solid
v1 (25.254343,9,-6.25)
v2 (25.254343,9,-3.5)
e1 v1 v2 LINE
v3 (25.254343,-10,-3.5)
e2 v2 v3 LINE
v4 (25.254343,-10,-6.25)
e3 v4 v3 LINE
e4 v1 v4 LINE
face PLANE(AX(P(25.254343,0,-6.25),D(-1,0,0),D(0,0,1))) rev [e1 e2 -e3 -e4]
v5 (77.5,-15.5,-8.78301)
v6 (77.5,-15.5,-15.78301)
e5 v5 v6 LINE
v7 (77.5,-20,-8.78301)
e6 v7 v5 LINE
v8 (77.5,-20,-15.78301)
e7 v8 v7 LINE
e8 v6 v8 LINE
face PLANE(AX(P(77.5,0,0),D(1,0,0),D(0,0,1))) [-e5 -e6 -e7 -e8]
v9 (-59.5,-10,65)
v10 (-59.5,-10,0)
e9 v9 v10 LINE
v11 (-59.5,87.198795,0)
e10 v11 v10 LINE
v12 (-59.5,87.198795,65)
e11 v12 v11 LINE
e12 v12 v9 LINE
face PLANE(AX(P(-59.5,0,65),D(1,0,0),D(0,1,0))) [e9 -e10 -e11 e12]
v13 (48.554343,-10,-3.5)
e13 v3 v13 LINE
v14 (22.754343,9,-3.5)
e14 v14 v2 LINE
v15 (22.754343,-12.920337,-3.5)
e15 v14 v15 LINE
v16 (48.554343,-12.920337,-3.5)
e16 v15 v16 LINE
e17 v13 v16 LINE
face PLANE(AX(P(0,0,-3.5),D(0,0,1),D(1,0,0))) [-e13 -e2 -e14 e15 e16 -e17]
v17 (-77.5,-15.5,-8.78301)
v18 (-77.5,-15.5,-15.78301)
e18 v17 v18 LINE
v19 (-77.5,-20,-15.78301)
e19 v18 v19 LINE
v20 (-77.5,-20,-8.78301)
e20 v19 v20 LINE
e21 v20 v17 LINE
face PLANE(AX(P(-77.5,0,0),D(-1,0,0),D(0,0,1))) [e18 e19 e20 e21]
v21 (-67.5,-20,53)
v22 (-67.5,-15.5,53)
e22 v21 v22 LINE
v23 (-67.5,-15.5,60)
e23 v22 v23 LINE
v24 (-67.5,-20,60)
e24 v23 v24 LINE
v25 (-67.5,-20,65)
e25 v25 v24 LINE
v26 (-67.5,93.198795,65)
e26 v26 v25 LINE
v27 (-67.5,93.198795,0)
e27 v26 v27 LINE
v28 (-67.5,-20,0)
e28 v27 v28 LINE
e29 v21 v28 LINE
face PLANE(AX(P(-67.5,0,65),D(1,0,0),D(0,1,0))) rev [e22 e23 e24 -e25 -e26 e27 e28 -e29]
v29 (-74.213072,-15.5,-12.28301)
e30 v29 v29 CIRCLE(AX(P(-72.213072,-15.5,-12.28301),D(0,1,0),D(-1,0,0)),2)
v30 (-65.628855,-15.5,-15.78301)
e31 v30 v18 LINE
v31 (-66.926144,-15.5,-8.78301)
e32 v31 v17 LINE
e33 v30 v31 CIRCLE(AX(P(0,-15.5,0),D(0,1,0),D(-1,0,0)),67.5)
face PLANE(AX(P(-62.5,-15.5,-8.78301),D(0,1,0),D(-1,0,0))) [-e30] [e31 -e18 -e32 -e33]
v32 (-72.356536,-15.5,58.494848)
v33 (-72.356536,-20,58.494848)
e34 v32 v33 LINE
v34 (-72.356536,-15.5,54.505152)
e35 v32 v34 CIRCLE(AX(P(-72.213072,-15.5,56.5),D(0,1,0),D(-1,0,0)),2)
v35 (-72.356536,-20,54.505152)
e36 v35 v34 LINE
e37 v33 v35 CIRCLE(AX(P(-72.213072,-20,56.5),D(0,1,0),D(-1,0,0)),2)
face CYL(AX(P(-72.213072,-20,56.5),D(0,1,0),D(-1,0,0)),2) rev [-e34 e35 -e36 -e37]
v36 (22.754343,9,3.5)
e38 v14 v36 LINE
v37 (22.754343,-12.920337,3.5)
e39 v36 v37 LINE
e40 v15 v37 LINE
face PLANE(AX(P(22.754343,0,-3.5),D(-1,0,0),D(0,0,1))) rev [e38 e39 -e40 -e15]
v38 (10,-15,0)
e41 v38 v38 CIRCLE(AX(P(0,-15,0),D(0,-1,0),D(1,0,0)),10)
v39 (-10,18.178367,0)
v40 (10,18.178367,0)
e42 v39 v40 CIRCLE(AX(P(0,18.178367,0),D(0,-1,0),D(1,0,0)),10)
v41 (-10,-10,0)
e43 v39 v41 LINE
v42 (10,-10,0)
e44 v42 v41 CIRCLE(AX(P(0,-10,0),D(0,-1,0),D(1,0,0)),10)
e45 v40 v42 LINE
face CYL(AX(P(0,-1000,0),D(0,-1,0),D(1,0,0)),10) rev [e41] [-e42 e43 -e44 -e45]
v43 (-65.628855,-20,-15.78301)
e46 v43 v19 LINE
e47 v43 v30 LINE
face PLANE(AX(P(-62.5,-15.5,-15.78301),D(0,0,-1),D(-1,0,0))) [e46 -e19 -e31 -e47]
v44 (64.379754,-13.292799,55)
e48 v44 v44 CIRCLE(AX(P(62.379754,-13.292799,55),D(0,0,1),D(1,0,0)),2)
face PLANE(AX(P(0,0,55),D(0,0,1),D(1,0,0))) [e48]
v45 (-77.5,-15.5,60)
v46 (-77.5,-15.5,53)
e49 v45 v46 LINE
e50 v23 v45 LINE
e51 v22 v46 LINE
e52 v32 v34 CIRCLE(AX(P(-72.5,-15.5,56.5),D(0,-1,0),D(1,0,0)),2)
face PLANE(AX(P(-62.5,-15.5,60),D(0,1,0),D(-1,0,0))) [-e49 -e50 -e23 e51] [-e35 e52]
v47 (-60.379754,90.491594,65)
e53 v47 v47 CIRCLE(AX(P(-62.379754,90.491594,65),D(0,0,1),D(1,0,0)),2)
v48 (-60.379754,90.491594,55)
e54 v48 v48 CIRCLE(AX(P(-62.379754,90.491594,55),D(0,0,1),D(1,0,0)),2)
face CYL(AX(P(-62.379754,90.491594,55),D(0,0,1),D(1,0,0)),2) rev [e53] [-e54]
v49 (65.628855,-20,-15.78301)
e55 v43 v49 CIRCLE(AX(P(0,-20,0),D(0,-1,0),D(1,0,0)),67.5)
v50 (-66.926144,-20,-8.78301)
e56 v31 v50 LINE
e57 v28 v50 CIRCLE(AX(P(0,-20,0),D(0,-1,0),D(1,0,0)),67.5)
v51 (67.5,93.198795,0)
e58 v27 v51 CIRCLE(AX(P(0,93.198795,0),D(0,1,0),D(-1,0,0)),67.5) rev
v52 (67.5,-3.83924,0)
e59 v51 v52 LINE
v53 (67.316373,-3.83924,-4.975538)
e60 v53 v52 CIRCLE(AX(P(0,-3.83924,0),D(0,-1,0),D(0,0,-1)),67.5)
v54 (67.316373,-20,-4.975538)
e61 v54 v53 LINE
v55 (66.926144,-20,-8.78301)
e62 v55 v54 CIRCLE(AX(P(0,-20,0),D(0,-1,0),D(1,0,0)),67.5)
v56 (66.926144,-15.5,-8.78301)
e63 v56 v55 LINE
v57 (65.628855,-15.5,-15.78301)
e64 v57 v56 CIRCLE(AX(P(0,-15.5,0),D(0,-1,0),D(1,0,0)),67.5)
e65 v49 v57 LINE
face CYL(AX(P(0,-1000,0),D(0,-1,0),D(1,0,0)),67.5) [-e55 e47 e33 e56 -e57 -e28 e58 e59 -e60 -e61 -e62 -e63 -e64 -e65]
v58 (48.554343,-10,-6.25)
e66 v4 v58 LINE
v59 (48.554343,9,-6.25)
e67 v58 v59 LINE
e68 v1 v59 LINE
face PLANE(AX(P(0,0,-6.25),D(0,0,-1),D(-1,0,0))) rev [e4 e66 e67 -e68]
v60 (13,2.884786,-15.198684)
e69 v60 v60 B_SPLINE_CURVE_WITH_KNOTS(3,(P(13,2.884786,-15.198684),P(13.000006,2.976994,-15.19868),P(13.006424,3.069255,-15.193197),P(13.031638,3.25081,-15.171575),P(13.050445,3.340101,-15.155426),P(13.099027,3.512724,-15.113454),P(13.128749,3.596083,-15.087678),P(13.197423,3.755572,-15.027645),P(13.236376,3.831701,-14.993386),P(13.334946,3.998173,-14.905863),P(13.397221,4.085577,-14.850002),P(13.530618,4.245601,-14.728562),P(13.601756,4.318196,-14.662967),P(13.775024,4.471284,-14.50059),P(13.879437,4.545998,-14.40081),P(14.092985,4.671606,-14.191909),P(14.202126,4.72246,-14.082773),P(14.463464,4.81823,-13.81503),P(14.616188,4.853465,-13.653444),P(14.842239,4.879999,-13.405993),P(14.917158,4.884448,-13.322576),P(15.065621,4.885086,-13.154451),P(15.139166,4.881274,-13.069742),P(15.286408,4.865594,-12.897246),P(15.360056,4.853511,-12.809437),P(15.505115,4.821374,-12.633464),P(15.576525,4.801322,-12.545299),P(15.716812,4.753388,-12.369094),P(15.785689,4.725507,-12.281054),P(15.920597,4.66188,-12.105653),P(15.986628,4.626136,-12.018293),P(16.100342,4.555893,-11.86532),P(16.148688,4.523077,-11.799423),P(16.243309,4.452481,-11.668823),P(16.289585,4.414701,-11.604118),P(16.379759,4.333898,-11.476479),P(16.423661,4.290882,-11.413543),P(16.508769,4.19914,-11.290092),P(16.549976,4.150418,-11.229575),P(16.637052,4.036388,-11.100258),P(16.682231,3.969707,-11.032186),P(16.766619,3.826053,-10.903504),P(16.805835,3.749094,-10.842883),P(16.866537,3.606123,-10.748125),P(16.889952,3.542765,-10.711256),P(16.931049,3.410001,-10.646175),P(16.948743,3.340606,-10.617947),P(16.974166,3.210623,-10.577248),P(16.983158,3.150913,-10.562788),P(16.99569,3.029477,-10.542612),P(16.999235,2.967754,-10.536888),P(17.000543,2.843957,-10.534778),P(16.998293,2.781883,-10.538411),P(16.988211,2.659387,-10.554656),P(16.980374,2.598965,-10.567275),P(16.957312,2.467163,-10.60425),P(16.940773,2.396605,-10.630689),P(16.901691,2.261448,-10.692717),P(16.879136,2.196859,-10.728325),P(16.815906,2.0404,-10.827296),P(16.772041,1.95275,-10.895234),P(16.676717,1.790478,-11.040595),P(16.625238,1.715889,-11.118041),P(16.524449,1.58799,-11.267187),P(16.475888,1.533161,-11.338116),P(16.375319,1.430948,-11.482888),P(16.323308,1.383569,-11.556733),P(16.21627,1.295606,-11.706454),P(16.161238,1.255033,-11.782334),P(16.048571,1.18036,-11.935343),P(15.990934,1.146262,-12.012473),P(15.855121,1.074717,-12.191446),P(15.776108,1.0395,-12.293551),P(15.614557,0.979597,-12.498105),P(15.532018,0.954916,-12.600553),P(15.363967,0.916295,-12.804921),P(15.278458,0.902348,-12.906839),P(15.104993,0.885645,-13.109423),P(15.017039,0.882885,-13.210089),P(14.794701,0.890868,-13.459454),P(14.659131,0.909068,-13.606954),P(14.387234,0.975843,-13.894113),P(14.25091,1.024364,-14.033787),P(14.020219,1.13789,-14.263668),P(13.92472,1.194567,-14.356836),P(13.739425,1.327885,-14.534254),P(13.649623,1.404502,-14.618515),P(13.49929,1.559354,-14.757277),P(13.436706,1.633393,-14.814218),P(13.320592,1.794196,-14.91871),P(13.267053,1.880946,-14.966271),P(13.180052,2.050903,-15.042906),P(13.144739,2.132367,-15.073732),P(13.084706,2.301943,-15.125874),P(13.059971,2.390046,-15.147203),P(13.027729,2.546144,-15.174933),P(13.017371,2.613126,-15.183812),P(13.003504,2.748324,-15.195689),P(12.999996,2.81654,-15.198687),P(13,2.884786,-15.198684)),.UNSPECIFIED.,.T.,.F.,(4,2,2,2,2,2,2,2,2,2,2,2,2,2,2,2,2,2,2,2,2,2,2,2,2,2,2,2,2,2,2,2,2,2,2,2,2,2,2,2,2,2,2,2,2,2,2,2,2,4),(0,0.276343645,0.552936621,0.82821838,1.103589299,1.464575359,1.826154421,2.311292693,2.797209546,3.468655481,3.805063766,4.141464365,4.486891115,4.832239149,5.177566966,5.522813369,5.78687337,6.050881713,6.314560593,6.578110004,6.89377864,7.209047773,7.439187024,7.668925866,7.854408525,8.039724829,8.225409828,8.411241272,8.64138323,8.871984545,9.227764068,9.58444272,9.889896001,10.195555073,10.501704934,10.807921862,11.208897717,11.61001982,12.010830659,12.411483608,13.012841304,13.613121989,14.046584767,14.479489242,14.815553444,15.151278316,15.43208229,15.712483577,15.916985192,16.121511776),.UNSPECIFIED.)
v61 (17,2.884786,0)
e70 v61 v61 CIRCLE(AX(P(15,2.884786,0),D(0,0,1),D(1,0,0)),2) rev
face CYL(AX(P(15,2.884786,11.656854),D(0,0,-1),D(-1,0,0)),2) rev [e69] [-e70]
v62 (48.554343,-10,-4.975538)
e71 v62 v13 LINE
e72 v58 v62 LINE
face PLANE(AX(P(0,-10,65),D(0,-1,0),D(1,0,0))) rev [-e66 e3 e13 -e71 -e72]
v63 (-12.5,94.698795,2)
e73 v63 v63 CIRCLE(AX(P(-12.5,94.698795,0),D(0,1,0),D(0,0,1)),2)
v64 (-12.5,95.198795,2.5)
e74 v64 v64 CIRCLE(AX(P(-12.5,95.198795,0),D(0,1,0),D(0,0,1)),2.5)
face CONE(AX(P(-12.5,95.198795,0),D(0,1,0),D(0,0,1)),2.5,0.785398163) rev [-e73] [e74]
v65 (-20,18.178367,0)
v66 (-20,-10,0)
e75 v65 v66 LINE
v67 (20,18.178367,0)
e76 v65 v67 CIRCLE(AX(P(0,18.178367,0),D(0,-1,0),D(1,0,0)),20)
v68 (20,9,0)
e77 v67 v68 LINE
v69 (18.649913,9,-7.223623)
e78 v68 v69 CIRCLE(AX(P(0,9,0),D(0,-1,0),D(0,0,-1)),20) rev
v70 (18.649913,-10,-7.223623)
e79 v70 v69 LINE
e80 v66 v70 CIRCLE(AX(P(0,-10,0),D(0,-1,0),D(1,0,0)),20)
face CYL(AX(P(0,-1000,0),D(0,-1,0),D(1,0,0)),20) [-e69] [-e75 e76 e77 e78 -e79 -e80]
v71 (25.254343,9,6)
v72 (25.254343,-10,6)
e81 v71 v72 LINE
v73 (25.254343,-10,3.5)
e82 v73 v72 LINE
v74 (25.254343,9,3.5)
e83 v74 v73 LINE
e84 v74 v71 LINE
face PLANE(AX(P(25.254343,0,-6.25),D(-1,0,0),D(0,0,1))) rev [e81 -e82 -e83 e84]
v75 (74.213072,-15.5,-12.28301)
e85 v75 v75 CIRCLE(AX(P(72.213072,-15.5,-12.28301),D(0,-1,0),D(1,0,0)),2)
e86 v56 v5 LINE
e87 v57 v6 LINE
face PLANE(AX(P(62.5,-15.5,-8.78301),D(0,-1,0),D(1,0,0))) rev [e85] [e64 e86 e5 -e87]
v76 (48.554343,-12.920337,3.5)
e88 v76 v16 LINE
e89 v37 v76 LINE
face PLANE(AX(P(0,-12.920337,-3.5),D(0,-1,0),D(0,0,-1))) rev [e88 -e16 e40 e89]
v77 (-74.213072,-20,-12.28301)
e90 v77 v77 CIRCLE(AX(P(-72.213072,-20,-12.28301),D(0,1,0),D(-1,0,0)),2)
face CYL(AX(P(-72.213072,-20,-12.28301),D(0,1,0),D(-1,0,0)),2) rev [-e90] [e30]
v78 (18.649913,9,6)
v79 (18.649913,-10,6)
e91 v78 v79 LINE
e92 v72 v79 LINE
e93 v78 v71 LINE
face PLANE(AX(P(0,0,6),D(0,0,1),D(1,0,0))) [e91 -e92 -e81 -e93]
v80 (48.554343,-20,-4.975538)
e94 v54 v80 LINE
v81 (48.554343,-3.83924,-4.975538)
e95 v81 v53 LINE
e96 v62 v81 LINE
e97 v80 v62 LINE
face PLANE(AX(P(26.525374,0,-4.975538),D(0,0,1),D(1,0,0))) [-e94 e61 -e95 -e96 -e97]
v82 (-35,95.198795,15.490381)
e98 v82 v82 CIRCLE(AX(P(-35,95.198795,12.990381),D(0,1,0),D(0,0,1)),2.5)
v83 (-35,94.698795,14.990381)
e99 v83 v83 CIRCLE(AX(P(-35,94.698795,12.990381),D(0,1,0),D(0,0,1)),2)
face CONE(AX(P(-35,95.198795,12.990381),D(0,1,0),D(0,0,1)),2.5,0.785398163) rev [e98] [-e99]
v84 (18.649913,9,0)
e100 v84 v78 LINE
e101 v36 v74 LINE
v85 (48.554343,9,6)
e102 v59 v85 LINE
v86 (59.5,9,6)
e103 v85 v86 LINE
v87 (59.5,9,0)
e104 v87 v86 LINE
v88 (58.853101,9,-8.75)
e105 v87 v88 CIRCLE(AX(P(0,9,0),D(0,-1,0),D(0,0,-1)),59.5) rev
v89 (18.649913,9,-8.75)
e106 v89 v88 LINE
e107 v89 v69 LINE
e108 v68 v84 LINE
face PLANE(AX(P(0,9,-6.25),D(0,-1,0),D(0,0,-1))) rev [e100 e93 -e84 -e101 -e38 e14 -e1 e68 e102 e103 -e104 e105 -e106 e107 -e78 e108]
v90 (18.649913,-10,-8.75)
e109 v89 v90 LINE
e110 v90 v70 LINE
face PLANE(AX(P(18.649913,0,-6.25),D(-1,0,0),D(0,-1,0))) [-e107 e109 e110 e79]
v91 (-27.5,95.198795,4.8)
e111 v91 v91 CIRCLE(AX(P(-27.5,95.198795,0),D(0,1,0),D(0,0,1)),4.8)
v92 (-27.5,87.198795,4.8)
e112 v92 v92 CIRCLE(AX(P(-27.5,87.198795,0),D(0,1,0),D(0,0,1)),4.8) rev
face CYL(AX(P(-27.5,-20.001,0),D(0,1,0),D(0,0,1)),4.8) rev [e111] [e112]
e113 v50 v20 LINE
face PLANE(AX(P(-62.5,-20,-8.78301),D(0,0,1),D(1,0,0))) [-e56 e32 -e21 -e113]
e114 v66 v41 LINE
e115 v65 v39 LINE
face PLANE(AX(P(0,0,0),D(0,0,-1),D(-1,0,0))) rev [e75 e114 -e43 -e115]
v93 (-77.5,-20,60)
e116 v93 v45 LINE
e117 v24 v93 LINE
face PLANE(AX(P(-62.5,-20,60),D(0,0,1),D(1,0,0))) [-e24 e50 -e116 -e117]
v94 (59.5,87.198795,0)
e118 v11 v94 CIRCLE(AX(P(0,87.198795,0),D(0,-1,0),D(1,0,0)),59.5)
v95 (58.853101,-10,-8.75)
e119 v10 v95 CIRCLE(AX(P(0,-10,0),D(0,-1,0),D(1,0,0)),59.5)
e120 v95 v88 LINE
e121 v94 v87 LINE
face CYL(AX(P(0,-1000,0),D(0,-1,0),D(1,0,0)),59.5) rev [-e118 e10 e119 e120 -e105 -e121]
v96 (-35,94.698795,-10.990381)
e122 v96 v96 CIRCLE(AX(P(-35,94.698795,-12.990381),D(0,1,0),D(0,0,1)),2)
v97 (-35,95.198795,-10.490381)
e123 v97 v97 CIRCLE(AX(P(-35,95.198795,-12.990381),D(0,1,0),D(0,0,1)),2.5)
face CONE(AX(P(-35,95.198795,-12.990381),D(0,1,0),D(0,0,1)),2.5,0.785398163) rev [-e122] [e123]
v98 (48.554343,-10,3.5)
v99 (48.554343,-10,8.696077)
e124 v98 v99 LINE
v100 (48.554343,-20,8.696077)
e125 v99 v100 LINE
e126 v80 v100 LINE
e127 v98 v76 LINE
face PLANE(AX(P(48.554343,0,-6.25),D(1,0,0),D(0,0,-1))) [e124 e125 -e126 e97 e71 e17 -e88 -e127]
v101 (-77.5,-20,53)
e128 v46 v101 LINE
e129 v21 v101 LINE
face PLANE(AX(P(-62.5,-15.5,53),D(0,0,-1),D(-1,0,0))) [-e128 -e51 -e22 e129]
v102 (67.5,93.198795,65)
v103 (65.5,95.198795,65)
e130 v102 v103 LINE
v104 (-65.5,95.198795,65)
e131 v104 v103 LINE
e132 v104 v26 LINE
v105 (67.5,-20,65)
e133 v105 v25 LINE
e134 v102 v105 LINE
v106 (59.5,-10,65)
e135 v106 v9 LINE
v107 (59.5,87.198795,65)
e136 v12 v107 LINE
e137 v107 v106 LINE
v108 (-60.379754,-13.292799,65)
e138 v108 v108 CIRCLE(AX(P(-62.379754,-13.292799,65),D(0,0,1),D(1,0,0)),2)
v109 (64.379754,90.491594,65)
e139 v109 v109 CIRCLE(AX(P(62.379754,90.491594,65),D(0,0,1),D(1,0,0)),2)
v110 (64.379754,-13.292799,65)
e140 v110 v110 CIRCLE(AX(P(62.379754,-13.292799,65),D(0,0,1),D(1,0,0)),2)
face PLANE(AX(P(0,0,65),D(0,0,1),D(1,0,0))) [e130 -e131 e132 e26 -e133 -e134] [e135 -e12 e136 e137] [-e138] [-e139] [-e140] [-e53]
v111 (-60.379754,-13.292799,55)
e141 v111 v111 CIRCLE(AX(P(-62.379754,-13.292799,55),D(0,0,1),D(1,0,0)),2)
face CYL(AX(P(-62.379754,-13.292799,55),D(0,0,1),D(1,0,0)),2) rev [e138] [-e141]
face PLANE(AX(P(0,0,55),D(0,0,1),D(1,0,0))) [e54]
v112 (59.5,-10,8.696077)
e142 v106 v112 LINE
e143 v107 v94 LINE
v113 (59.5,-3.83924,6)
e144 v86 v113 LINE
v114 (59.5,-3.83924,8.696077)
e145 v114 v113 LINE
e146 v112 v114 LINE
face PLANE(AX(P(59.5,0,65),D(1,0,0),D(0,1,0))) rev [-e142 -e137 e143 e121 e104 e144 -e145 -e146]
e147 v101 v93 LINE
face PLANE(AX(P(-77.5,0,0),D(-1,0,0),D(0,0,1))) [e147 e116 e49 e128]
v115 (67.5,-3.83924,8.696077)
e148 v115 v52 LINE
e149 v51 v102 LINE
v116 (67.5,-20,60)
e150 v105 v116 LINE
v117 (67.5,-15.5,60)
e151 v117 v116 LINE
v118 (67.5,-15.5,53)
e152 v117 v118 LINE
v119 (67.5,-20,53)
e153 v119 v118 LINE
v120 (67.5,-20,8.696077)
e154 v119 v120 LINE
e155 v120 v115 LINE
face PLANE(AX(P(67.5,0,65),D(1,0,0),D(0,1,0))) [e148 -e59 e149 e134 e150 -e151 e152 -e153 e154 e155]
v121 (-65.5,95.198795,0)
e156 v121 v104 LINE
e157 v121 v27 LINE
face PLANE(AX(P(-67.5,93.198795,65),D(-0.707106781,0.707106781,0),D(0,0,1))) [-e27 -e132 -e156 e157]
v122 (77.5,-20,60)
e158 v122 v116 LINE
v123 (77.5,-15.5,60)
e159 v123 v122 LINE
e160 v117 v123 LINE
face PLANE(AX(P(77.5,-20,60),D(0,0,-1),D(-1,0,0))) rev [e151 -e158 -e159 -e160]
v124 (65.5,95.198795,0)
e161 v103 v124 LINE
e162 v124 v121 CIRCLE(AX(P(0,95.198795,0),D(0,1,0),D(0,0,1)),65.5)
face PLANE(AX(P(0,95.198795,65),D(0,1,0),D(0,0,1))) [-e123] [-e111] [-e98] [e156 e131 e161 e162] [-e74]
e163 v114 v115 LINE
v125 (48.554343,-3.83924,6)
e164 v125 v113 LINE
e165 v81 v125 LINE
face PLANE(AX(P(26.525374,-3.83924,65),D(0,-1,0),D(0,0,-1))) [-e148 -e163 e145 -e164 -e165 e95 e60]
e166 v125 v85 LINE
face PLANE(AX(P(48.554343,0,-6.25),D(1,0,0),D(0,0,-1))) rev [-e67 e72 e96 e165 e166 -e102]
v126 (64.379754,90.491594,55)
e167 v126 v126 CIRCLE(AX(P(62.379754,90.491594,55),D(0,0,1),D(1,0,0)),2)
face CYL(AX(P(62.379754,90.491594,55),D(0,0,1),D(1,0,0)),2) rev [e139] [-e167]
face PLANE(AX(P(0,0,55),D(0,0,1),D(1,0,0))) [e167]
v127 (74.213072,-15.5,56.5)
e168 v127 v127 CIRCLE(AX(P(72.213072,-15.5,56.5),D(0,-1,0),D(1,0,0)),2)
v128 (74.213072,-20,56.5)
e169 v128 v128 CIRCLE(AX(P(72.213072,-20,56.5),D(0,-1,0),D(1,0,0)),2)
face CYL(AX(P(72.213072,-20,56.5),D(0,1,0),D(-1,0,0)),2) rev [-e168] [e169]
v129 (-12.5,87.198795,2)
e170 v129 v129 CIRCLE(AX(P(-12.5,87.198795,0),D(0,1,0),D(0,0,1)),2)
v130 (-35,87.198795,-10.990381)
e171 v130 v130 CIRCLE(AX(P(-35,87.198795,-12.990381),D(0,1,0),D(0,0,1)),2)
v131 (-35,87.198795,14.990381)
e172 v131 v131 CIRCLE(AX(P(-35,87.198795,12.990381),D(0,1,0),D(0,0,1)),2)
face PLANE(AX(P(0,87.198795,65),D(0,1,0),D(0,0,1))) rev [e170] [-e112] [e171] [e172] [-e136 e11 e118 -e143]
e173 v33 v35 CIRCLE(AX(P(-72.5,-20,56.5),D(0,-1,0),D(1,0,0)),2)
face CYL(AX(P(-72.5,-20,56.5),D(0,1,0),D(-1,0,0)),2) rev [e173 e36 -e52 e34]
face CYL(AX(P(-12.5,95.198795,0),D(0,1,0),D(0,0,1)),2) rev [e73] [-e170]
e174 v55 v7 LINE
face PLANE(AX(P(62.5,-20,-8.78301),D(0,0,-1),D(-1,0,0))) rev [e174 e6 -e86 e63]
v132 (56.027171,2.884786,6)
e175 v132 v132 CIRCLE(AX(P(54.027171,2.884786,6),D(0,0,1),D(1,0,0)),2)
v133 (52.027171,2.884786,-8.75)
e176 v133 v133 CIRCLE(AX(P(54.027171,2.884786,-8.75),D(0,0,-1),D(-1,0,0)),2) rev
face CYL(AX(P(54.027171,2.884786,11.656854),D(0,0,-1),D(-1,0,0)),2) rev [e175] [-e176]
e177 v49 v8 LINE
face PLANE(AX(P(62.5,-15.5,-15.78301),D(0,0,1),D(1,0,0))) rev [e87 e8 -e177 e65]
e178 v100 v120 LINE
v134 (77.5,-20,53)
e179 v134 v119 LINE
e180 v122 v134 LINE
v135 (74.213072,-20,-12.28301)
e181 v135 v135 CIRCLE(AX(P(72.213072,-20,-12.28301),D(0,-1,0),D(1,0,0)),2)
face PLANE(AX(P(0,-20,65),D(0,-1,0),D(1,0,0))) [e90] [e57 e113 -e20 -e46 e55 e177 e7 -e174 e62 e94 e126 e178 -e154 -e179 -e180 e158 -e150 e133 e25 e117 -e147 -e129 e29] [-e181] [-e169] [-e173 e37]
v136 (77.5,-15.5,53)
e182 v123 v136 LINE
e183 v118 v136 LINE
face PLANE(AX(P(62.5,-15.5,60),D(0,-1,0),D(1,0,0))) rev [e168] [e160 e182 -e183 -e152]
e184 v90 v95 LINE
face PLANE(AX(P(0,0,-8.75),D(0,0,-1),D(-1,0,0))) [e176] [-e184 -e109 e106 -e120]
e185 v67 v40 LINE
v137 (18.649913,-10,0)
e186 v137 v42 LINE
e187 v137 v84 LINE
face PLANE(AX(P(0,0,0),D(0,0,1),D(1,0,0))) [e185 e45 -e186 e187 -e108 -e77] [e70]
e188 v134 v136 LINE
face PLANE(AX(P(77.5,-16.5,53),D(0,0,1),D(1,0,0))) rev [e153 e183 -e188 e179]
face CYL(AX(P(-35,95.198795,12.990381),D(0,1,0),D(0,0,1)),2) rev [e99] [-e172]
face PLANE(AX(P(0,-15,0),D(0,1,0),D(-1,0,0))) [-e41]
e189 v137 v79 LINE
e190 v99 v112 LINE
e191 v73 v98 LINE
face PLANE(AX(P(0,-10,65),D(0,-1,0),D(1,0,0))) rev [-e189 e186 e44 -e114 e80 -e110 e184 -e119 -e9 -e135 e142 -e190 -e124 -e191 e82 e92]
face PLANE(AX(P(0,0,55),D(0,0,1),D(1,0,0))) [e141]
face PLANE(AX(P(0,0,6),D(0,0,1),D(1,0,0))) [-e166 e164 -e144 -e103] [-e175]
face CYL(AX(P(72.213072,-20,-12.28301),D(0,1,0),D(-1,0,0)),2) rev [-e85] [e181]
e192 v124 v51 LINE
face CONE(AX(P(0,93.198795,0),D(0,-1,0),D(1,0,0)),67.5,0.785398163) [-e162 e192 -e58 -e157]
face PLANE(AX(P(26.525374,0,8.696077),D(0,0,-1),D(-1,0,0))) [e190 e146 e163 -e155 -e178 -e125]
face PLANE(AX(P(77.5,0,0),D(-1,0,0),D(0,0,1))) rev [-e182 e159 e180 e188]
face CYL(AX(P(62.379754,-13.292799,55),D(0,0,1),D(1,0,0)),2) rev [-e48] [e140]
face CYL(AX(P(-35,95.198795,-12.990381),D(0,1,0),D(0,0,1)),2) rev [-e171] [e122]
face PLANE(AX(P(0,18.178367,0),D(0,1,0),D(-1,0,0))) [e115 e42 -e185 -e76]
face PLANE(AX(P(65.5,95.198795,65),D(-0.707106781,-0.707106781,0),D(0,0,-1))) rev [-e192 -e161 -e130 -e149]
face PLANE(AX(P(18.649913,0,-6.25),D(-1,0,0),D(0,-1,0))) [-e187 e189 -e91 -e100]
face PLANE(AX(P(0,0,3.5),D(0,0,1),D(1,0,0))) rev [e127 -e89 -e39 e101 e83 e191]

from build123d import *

# Parameters (mm, degrees)
BOSS_EXTRUDE3_DEPTH                   = 65
BOSS_EXTRUDE1_DEPTH                   = 6
BOSS_EXTRUDE1_DEPTH_BACK              = 6.25
SKETCH1_5_W                           = 6.6044296
SKETCH1_5_H                           = 19
SKETCH1_5_W_2                         = 10.945657065
BOSS_EXTRUDE2_START                   = -8.75
BOSS_EXTRUDE2_OUTLINE_W               = 40.850086665
BOSS_EXTRUDE2_OUTLINE_H               = 19
BOSS_EXTRUDE2_DEPTH                   = 2.5
REVOLVE2_ANGLE                        = 180
SKETCH1_12_W                          = 10
SKETCH1_12_H                          = 5
REVOLVE4_START                        = -10
REVOLVE4_DEPTH                        = 28.178366994
SERVO_START                           = 67.5
SKETCH9_W                             = 13.671614749
SKETCH9_H                             = 17.273170498
SERVO_WIRE_CUT_DEPTH                  = 18.945657065
CUT_EXTRUDE2_DEPTH                    = 3.5
F_4_0_4_DIAMETER_HOLE1_D              = 4
F_4_0_4_DIAMETER_HOLE1_DEPTH          = 8
F_4_0_4_DIAMETER_HOLE1_CSINK_D        = 5
F_4_0_4_DIAMETER_HOLE1_CSINK_ANGLE    = 90
CIRPATTERN1_COUNT                     = 3
CUT_EXTRUDE4_REACH                    = 151.61
SKETCH21_2_R                          = 4.8
SKETCH12_R                            = 2
HEAT_SET_INSERT_CUT_DEPTH             = 17
HEAT_SET_INSERT_CUT_DIRECTION_2_REACH = 136.816
SKETCH14_R                            = 2
PANEL_HEAT_SET_INSERT_CUT_DEPTH       = 10
BOSS_EXTRUDE10_START                  = -5
SKETCH16_W                            = 7
SKETCH16_H                            = 4.5
BOSS_EXTRUDE10_DEPTH                  = 15
SKETCH18_W                            = 7
SKETCH18_H                            = 3.5
BOSS_EXTRUDE11_DEPTH                  = 10
SKETCH19_R                            = 2
CUT_EXTRUDE1_DEPTH                    = 152.05205452
CHAMFER1_SIZE                         = 2


# Read off the part's stored shape, not the designer's step: Boss-Extrude2, Revolve4
with BuildPart() as part:
    # Sketch4 → Boss-Extrude3 (new body)
    with BuildSketch(Plane.XY):
        Polygon((59.5, -10), (0, -10), (0, -15), (0, -20), (67.5, -20), (67.5, 95.198794821), (0, 95.198794821), (0, 87.198794821), (59.5, 87.198794821), align=None)
    boss_extrude3 = extrude(amount=BOSS_EXTRUDE3_DEPTH)

    # Mirror1: Boss-Extrude3 across plane
    add(boss_extrude3.mirror(Plane(origin=(0, 0, 0), x_dir=(0, 0, 1), z_dir=(1, 0, 0))))

    # Sketch1<5> → Boss-Extrude1 (add, two sides: drawn at the far end of the back side and taken through both)
    with BuildSketch(Plane.XY.offset(-BOSS_EXTRUDE1_DEPTH_BACK)):
        with Locations((21.952128135, -0.5)):
            Rectangle(SKETCH1_5_W, SKETCH1_5_H)
        with Locations((54.027171468, -0.5)):
            Rectangle(SKETCH1_5_W_2, SKETCH1_5_H)
    extrude(amount=BOSS_EXTRUDE1_DEPTH + BOSS_EXTRUDE1_DEPTH_BACK)

    # Boss-Extrude2 outline → Boss-Extrude2 (add)
    with BuildSketch(Plane.XY.offset(BOSS_EXTRUDE2_START)):
        with Locations((39.074956668, -0.5)):
            Rectangle(BOSS_EXTRUDE2_OUTLINE_W, BOSS_EXTRUDE2_OUTLINE_H)
    extrude(amount=BOSS_EXTRUDE2_DEPTH)

    # Sketch1 → Revolve2 (revolve)
    with BuildSketch(Plane.XY):
        Polygon((0, -15), (0, -20), (67.5, -20), (67.5, 95.198794821), (0, 95.198794821), (0, 87.198794821), (59.5, 87.198794821), (59.5, -10), (0, -10), align=None)
    revolve(axis=Axis((0, -1000, 0), (0, 1, 0)), revolution_arc=REVOLVE2_ANGLE)

    # Sketch1<12> → Cut-Revolve4 (revolve, cut)
    with BuildSketch(Plane.XY):
        with Locations((5, -12.5)):
            Rectangle(SKETCH1_12_W, SKETCH1_12_H)
    revolve(axis=Axis((0, -1000, 0), (0, 1, 0)), mode=Mode.SUBTRACT)

    # Revolve4 outline → Revolve4 (add)
    with BuildSketch(Plane(origin=(0, 0, 0), x_dir=(1, 0, 0), z_dir=(0, 1, 0)).offset(REVOLVE4_START)):
        with BuildLine():
            ThreePointArc((-10, 0), (0, 10), (10, 0))
            Line((10, 0), (20, 0))
            ThreePointArc((20, 0), (0, 20), (-20, 0))
            Line((-20, 0), (-10, 0))
        make_face()
    extrude(amount=REVOLVE4_DEPTH)

    # Sketch9 → Servo Wire Cut (cut)
    with BuildSketch(Plane(origin=(0, 0, 0), x_dir=(0, 0, -1), z_dir=(1, 0, 0)).offset(SERVO_START)):
        with Locations((-1.860269854, -12.475825554)):
            Rectangle(SKETCH9_W, SKETCH9_H)
    extrude(amount=-SERVO_WIRE_CUT_DEPTH, mode=Mode.SUBTRACT)

    # Sketch1<13> → Cut-Extrude2 (cut, symmetric)
    with BuildSketch(Plane.XY):
        Polygon((22.754342935, -12.920336749), (59.5, -12.920336749), (59.5, -10), (25.254342935, -10), (25.254342935, 9), (22.754342935, 9), align=None)
    extrude(amount=CUT_EXTRUDE2_DEPTH, both=True, mode=Mode.SUBTRACT)

    # Ø4.0 (4) Diameter Hole1
    with Locations(Plane(origin=(0, 95.198794821, 0), x_dir=(1, 0, 0), z_dir=(0, 1, 0))):
        with Locations((-12.5, 0)):
            f_4_0_4_diameter_hole1 = CounterSinkHole(F_4_0_4_DIAMETER_HOLE1_D / 2, F_4_0_4_DIAMETER_HOLE1_CSINK_D / 2, depth=F_4_0_4_DIAMETER_HOLE1_DEPTH, counter_sink_angle=F_4_0_4_DIAMETER_HOLE1_CSINK_ANGLE)

    # CirPattern1: Ø4.0 (4) Diameter Hole1 ×3 about axis
    cirpattern1_axis = Axis((-27.5, 0, 0), (0, 1, 0))
    for i in range(1, CIRPATTERN1_COUNT):
        add(f_4_0_4_diameter_hole1.rotate(cirpattern1_axis, i * 360 / CIRPATTERN1_COUNT), mode=Mode.SUBTRACT)

    # Sketch21<2> → Cut-Extrude4 (cut, up to next)
    with BuildSketch(Plane(origin=(0, 95.198794821, 0), x_dir=(1, 0, 0), z_dir=(0, 1, 0)), mode=Mode.PRIVATE) as cut_extrude4_sk1:
        with Locations(Location((-27.5, 0, 0), (0, 0, 270))):
            Circle(SKETCH21_2_R)
    cut_extrude4_tool1 = extrude(cut_extrude4_sk1.sketch, amount=-CUT_EXTRUDE4_REACH, mode=Mode.PRIVATE) & part.part
    add(cut_extrude4_tool1.solids().sort_by_distance((-27.5, 95.198795, 0))[0], mode=Mode.SUBTRACT)

    # Sketch12 → Heat Set Insert Cut (cut)
    with BuildSketch(Plane.XY):
        with Locations(Location((54.027171468, 2.884785525, 0), (0, 0, 180))):
            Circle(SKETCH12_R)
        with Locations(Location((15, 2.884785525, 0), (0, 0, 180))):
            Circle(SKETCH12_R)
    extrude(amount=-HEAT_SET_INSERT_CUT_DEPTH, mode=Mode.SUBTRACT)

    # Heat Set Insert Cut direction 2: up to this face of the body (flat: up to its plane)
    heat_set_insert_cut_direction_2_end = Plane(part.part.faces().sort_by_distance((54.027171468, 2.580379847, 6))[0])
    # Sketch12 → Heat Set Insert Cut direction 2 (cut, up to the picked face)
    with BuildSketch(Plane.XY, mode=Mode.PRIVATE) as heat_set_insert_cut_direction_2_sk1:
        with Locations(Location((54.027171468, 2.884785525, 0), (0, 0, 180))):
            Circle(SKETCH12_R)
    heat_set_insert_cut_direction_2_tool1 = split(extrude(heat_set_insert_cut_direction_2_sk1.sketch, amount=HEAT_SET_INSERT_CUT_DIRECTION_2_REACH, mode=Mode.PRIVATE), bisect_by=heat_set_insert_cut_direction_2_end, keep=Keep.BOTH, mode=Mode.PRIVATE)
    # Sketch12 → Heat Set Insert Cut direction 2 (cut, up to the picked face)
    with BuildSketch(Plane.XY, mode=Mode.PRIVATE) as heat_set_insert_cut_direction_2_sk2:
        with Locations(Location((15, 2.884785525, 0), (0, 0, 180))):
            Circle(SKETCH12_R)
    heat_set_insert_cut_direction_2_tool2 = split(extrude(heat_set_insert_cut_direction_2_sk2.sketch, amount=HEAT_SET_INSERT_CUT_DIRECTION_2_REACH, mode=Mode.PRIVATE), bisect_by=heat_set_insert_cut_direction_2_end, keep=Keep.BOTH, mode=Mode.PRIVATE)
    add(heat_set_insert_cut_direction_2_tool1.solids().sort_by(Axis((54.027171, 2.884786, 0), (0, 0, 1)))[0], mode=Mode.SUBTRACT)
    add(heat_set_insert_cut_direction_2_tool2.solids().sort_by(Axis((15, 2.884786, 0), (0, 0, 1)))[0], mode=Mode.SUBTRACT)

    # Sketch14 → Panel Heat Set Insert Cut (cut)
    with BuildSketch(Plane.XY.offset(65)):
        with Locations((-62.379754231, 90.491593885)):
            Circle(SKETCH14_R)
        with Locations((62.379754231, 90.491593885)):
            Circle(SKETCH14_R)
        with Locations((62.379754231, -13.292799065)):
            Circle(SKETCH14_R)
        with Locations((-62.379754231, -13.292799065)):
            Circle(SKETCH14_R)
    extrude(amount=-PANEL_HEAT_SET_INSERT_CUT_DEPTH, mode=Mode.SUBTRACT)

    # Sketch16 → Boss-Extrude10 (add)
    with BuildSketch(Plane.ZY.offset(67.5).offset(BOSS_EXTRUDE10_START)):
        with Locations((-12.283009655, -17.75)):
            Rectangle(SKETCH16_W, SKETCH16_H)
        with Locations((56.5, -17.75)):
            Rectangle(SKETCH16_W, SKETCH16_H)
    boss_extrude10 = extrude(amount=BOSS_EXTRUDE10_DEPTH)

    # Sketch18 → Boss-Extrude11 (add)
    with BuildSketch(Plane(origin=(67.5, 0, 0), x_dir=(0, 0, -1), z_dir=(1, 0, 0))):
        with Locations((-56.5, -18.25)):
            Rectangle(SKETCH18_W, SKETCH18_H)
    extrude(amount=BOSS_EXTRUDE11_DEPTH)

    # Sketch19 → Cut-Extrude1 (cut, through all)
    with BuildSketch(Plane(origin=(0, -15.5, 0), x_dir=(1, 0, 0), z_dir=(0, 1, 0))):
        with Locations(Location((-72.213071965, -56.5, 0), (0, 0, 180))):
            Circle(SKETCH19_R)
        with Locations(Location((-72.213071965, 12.283009655, 0), (0, 0, 180))):
            Circle(SKETCH19_R)
        with Locations(Location((72.5, -56.5, 0), (0, 0, 180))):
            Circle(SKETCH19_R)
    cut_extrude1 = extrude(amount=-CUT_EXTRUDE1_DEPTH, mode=Mode.SUBTRACT)

    # Mirror3: Boss-Extrude10, Cut-Extrude1 across plane
    add(boss_extrude10.mirror(Plane(origin=(0, 0, 0), x_dir=(0, 0, 1), z_dir=(1, 0, 0))))
    add(cut_extrude1.mirror(Plane(origin=(0, 0, 0), x_dir=(0, 0, 1), z_dir=(1, 0, 0))), mode=Mode.SUBTRACT)

    # Chamfer1
    chamfer1_edges = [part.edges().sort_by_distance(p)[0] for p in [
        (0, 95.198794821, -67.5),
        (67.5, 95.198794821, 32.5),
        (-67.5, 95.198794821, 32.5),
    ]]
    chamfer(chamfer1_edges, length=CHAMFER1_SIZE)


solid = part.part
